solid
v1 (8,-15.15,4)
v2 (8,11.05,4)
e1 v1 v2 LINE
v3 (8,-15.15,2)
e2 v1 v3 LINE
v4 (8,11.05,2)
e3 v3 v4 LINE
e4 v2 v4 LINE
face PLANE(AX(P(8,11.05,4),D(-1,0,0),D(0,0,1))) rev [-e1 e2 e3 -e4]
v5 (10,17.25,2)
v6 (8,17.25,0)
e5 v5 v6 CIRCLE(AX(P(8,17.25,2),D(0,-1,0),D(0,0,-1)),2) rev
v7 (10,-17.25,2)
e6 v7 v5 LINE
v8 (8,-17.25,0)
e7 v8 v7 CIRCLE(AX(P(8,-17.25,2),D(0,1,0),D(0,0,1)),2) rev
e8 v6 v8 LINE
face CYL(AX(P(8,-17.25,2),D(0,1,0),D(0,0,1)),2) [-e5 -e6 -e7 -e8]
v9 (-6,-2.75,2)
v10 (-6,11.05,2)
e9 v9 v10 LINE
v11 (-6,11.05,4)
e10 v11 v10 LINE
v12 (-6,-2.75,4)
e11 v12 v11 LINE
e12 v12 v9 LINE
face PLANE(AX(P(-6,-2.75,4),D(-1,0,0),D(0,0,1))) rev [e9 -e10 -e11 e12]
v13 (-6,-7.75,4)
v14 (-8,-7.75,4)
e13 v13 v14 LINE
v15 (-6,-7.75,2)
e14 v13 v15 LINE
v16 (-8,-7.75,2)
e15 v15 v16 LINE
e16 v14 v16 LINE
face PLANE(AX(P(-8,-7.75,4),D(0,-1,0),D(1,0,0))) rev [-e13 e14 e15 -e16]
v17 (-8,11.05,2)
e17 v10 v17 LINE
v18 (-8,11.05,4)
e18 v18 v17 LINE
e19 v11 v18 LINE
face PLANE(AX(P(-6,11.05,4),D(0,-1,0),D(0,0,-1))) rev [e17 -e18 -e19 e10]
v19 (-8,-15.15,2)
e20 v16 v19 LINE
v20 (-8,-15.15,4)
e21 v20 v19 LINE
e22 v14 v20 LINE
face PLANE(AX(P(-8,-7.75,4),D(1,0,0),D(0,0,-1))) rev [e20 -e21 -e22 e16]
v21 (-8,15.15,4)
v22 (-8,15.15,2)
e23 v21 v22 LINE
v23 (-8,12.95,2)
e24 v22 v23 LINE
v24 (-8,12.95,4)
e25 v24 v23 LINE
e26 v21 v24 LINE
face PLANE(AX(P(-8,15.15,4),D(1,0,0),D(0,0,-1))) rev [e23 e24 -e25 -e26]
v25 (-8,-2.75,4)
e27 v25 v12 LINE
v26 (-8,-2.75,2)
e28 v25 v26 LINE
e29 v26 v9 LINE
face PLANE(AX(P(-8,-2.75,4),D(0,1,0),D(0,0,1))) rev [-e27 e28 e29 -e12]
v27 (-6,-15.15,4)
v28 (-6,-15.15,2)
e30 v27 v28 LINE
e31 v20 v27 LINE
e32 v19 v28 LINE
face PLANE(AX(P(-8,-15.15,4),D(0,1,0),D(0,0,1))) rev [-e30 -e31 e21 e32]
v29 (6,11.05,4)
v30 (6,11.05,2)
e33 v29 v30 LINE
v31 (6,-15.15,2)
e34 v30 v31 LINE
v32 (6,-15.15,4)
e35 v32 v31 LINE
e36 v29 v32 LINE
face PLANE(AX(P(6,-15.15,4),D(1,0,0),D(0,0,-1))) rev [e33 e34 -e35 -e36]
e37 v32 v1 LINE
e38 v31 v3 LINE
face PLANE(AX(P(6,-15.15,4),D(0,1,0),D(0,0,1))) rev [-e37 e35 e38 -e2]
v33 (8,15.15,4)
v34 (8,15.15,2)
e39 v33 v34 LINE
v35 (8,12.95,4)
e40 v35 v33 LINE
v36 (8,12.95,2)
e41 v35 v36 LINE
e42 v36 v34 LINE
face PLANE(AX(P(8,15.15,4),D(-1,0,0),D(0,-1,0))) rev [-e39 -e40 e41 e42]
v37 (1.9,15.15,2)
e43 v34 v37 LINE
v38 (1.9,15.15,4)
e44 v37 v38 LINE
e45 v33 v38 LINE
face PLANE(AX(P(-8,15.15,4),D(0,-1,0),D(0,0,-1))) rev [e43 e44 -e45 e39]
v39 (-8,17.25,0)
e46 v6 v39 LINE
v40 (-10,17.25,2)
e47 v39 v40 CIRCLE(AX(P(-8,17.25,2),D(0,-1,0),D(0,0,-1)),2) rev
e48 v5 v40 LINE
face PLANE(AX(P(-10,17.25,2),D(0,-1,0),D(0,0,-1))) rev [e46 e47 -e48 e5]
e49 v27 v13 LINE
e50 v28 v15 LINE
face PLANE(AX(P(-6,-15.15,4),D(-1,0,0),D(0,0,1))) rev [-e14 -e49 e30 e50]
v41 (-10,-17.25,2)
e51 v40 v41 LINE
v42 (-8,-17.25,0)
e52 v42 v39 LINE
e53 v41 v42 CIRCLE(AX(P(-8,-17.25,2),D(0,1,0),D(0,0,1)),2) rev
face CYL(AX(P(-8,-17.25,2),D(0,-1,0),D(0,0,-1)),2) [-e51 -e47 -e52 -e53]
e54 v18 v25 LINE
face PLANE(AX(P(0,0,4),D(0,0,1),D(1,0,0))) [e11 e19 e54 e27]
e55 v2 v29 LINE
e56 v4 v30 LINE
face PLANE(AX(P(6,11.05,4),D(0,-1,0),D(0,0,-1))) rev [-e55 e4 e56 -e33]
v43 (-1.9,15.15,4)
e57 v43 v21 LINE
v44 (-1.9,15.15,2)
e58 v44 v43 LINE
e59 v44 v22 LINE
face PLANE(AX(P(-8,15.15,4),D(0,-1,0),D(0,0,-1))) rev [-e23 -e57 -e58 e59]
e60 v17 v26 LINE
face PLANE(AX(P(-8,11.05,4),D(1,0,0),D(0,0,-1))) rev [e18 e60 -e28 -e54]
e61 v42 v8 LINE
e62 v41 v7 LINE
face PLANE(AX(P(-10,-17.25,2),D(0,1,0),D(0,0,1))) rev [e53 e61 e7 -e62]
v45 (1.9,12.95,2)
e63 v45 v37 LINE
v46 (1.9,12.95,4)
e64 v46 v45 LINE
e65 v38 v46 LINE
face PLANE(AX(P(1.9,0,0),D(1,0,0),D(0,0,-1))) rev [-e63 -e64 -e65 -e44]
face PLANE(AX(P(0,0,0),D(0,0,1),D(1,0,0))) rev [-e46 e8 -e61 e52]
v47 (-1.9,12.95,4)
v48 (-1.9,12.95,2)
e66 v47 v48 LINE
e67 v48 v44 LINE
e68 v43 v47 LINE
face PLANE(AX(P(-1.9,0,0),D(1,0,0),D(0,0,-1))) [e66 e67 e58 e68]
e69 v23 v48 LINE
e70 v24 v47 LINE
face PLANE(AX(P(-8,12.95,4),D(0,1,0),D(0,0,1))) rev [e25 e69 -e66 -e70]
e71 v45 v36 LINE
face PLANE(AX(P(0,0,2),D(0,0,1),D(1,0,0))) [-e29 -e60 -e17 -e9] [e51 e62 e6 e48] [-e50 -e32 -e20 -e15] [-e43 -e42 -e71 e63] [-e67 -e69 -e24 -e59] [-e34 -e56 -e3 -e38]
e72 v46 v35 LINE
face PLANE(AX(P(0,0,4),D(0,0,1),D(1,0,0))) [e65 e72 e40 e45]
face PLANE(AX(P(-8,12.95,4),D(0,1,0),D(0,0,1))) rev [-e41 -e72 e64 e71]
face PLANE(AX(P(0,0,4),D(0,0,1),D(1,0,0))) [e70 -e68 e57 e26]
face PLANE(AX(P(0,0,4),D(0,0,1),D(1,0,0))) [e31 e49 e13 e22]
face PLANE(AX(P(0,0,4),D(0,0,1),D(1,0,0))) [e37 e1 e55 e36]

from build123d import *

# Parameters (mm, degrees)
SKETCH1_W               = 34.5
SKETCH1_H               = 20
BOSS_EXTRUDE1_DEPTH     = 2
FILLET1_R               = 2
SKETCH2_W               = 16
SKETCH2_H               = 2.2
SKETCH2_W_2             = 2
SKETCH2_H_2             = 7.4
SKETCH2_H_3             = 26.2
SKETCH2_H_4             = 13.8
BOSS_EXTRUDE2_DEPTH     = 2
CUT_EXTRUDE1_DEPTH      = 1.9
CUT_EXTRUDE1_DEPTH_BACK = 1.9
SKETCH3_W               = 2.2
SKETCH3_H               = 2


with BuildPart() as part:
    # Sketch1 → Boss-Extrude1 (new body)
    with BuildSketch(Plane(origin=(0, 0, 0), x_dir=(0, 1, 0), z_dir=(0, 0, 1))):
        Rectangle(SKETCH1_W, SKETCH1_H)
    extrude(amount=BOSS_EXTRUDE1_DEPTH)

    # Fillet1
    fillet1_edges = [part.edges().sort_by_distance(p)[0] for p in [
        (-10, 0, 0),
        (10, 0, 0),
    ]]
    fillet(fillet1_edges, radius=FILLET1_R - 0.0001)  # a hair under: the kernel refuses the full size

    # Sketch2 → Boss-Extrude2 (add)
    with BuildSketch(Plane.XY.offset(2)):
        with Locations((0, 14.05)):
            Rectangle(SKETCH2_W, SKETCH2_H)
        with Locations((-7, -11.45)):
            Rectangle(SKETCH2_W_2, SKETCH2_H_2)
        with Locations((7, -2.05)):
            Rectangle(SKETCH2_W_2, SKETCH2_H_3)
        with Locations((-7, 4.15)):
            Rectangle(SKETCH2_W_2, SKETCH2_H_4)
    extrude(amount=BOSS_EXTRUDE2_DEPTH)

    # Sketch3 → Cut-Extrude1 (cut, two sides: drawn at the far end of the back side and taken through both)
    with BuildSketch(Plane.YZ.offset(-CUT_EXTRUDE1_DEPTH_BACK)):
        with Locations((14.05, 3)):
            Rectangle(SKETCH3_W, SKETCH3_H)
    extrude(amount=CUT_EXTRUDE1_DEPTH + CUT_EXTRUDE1_DEPTH_BACK, mode=Mode.SUBTRACT)


solid = part.part
